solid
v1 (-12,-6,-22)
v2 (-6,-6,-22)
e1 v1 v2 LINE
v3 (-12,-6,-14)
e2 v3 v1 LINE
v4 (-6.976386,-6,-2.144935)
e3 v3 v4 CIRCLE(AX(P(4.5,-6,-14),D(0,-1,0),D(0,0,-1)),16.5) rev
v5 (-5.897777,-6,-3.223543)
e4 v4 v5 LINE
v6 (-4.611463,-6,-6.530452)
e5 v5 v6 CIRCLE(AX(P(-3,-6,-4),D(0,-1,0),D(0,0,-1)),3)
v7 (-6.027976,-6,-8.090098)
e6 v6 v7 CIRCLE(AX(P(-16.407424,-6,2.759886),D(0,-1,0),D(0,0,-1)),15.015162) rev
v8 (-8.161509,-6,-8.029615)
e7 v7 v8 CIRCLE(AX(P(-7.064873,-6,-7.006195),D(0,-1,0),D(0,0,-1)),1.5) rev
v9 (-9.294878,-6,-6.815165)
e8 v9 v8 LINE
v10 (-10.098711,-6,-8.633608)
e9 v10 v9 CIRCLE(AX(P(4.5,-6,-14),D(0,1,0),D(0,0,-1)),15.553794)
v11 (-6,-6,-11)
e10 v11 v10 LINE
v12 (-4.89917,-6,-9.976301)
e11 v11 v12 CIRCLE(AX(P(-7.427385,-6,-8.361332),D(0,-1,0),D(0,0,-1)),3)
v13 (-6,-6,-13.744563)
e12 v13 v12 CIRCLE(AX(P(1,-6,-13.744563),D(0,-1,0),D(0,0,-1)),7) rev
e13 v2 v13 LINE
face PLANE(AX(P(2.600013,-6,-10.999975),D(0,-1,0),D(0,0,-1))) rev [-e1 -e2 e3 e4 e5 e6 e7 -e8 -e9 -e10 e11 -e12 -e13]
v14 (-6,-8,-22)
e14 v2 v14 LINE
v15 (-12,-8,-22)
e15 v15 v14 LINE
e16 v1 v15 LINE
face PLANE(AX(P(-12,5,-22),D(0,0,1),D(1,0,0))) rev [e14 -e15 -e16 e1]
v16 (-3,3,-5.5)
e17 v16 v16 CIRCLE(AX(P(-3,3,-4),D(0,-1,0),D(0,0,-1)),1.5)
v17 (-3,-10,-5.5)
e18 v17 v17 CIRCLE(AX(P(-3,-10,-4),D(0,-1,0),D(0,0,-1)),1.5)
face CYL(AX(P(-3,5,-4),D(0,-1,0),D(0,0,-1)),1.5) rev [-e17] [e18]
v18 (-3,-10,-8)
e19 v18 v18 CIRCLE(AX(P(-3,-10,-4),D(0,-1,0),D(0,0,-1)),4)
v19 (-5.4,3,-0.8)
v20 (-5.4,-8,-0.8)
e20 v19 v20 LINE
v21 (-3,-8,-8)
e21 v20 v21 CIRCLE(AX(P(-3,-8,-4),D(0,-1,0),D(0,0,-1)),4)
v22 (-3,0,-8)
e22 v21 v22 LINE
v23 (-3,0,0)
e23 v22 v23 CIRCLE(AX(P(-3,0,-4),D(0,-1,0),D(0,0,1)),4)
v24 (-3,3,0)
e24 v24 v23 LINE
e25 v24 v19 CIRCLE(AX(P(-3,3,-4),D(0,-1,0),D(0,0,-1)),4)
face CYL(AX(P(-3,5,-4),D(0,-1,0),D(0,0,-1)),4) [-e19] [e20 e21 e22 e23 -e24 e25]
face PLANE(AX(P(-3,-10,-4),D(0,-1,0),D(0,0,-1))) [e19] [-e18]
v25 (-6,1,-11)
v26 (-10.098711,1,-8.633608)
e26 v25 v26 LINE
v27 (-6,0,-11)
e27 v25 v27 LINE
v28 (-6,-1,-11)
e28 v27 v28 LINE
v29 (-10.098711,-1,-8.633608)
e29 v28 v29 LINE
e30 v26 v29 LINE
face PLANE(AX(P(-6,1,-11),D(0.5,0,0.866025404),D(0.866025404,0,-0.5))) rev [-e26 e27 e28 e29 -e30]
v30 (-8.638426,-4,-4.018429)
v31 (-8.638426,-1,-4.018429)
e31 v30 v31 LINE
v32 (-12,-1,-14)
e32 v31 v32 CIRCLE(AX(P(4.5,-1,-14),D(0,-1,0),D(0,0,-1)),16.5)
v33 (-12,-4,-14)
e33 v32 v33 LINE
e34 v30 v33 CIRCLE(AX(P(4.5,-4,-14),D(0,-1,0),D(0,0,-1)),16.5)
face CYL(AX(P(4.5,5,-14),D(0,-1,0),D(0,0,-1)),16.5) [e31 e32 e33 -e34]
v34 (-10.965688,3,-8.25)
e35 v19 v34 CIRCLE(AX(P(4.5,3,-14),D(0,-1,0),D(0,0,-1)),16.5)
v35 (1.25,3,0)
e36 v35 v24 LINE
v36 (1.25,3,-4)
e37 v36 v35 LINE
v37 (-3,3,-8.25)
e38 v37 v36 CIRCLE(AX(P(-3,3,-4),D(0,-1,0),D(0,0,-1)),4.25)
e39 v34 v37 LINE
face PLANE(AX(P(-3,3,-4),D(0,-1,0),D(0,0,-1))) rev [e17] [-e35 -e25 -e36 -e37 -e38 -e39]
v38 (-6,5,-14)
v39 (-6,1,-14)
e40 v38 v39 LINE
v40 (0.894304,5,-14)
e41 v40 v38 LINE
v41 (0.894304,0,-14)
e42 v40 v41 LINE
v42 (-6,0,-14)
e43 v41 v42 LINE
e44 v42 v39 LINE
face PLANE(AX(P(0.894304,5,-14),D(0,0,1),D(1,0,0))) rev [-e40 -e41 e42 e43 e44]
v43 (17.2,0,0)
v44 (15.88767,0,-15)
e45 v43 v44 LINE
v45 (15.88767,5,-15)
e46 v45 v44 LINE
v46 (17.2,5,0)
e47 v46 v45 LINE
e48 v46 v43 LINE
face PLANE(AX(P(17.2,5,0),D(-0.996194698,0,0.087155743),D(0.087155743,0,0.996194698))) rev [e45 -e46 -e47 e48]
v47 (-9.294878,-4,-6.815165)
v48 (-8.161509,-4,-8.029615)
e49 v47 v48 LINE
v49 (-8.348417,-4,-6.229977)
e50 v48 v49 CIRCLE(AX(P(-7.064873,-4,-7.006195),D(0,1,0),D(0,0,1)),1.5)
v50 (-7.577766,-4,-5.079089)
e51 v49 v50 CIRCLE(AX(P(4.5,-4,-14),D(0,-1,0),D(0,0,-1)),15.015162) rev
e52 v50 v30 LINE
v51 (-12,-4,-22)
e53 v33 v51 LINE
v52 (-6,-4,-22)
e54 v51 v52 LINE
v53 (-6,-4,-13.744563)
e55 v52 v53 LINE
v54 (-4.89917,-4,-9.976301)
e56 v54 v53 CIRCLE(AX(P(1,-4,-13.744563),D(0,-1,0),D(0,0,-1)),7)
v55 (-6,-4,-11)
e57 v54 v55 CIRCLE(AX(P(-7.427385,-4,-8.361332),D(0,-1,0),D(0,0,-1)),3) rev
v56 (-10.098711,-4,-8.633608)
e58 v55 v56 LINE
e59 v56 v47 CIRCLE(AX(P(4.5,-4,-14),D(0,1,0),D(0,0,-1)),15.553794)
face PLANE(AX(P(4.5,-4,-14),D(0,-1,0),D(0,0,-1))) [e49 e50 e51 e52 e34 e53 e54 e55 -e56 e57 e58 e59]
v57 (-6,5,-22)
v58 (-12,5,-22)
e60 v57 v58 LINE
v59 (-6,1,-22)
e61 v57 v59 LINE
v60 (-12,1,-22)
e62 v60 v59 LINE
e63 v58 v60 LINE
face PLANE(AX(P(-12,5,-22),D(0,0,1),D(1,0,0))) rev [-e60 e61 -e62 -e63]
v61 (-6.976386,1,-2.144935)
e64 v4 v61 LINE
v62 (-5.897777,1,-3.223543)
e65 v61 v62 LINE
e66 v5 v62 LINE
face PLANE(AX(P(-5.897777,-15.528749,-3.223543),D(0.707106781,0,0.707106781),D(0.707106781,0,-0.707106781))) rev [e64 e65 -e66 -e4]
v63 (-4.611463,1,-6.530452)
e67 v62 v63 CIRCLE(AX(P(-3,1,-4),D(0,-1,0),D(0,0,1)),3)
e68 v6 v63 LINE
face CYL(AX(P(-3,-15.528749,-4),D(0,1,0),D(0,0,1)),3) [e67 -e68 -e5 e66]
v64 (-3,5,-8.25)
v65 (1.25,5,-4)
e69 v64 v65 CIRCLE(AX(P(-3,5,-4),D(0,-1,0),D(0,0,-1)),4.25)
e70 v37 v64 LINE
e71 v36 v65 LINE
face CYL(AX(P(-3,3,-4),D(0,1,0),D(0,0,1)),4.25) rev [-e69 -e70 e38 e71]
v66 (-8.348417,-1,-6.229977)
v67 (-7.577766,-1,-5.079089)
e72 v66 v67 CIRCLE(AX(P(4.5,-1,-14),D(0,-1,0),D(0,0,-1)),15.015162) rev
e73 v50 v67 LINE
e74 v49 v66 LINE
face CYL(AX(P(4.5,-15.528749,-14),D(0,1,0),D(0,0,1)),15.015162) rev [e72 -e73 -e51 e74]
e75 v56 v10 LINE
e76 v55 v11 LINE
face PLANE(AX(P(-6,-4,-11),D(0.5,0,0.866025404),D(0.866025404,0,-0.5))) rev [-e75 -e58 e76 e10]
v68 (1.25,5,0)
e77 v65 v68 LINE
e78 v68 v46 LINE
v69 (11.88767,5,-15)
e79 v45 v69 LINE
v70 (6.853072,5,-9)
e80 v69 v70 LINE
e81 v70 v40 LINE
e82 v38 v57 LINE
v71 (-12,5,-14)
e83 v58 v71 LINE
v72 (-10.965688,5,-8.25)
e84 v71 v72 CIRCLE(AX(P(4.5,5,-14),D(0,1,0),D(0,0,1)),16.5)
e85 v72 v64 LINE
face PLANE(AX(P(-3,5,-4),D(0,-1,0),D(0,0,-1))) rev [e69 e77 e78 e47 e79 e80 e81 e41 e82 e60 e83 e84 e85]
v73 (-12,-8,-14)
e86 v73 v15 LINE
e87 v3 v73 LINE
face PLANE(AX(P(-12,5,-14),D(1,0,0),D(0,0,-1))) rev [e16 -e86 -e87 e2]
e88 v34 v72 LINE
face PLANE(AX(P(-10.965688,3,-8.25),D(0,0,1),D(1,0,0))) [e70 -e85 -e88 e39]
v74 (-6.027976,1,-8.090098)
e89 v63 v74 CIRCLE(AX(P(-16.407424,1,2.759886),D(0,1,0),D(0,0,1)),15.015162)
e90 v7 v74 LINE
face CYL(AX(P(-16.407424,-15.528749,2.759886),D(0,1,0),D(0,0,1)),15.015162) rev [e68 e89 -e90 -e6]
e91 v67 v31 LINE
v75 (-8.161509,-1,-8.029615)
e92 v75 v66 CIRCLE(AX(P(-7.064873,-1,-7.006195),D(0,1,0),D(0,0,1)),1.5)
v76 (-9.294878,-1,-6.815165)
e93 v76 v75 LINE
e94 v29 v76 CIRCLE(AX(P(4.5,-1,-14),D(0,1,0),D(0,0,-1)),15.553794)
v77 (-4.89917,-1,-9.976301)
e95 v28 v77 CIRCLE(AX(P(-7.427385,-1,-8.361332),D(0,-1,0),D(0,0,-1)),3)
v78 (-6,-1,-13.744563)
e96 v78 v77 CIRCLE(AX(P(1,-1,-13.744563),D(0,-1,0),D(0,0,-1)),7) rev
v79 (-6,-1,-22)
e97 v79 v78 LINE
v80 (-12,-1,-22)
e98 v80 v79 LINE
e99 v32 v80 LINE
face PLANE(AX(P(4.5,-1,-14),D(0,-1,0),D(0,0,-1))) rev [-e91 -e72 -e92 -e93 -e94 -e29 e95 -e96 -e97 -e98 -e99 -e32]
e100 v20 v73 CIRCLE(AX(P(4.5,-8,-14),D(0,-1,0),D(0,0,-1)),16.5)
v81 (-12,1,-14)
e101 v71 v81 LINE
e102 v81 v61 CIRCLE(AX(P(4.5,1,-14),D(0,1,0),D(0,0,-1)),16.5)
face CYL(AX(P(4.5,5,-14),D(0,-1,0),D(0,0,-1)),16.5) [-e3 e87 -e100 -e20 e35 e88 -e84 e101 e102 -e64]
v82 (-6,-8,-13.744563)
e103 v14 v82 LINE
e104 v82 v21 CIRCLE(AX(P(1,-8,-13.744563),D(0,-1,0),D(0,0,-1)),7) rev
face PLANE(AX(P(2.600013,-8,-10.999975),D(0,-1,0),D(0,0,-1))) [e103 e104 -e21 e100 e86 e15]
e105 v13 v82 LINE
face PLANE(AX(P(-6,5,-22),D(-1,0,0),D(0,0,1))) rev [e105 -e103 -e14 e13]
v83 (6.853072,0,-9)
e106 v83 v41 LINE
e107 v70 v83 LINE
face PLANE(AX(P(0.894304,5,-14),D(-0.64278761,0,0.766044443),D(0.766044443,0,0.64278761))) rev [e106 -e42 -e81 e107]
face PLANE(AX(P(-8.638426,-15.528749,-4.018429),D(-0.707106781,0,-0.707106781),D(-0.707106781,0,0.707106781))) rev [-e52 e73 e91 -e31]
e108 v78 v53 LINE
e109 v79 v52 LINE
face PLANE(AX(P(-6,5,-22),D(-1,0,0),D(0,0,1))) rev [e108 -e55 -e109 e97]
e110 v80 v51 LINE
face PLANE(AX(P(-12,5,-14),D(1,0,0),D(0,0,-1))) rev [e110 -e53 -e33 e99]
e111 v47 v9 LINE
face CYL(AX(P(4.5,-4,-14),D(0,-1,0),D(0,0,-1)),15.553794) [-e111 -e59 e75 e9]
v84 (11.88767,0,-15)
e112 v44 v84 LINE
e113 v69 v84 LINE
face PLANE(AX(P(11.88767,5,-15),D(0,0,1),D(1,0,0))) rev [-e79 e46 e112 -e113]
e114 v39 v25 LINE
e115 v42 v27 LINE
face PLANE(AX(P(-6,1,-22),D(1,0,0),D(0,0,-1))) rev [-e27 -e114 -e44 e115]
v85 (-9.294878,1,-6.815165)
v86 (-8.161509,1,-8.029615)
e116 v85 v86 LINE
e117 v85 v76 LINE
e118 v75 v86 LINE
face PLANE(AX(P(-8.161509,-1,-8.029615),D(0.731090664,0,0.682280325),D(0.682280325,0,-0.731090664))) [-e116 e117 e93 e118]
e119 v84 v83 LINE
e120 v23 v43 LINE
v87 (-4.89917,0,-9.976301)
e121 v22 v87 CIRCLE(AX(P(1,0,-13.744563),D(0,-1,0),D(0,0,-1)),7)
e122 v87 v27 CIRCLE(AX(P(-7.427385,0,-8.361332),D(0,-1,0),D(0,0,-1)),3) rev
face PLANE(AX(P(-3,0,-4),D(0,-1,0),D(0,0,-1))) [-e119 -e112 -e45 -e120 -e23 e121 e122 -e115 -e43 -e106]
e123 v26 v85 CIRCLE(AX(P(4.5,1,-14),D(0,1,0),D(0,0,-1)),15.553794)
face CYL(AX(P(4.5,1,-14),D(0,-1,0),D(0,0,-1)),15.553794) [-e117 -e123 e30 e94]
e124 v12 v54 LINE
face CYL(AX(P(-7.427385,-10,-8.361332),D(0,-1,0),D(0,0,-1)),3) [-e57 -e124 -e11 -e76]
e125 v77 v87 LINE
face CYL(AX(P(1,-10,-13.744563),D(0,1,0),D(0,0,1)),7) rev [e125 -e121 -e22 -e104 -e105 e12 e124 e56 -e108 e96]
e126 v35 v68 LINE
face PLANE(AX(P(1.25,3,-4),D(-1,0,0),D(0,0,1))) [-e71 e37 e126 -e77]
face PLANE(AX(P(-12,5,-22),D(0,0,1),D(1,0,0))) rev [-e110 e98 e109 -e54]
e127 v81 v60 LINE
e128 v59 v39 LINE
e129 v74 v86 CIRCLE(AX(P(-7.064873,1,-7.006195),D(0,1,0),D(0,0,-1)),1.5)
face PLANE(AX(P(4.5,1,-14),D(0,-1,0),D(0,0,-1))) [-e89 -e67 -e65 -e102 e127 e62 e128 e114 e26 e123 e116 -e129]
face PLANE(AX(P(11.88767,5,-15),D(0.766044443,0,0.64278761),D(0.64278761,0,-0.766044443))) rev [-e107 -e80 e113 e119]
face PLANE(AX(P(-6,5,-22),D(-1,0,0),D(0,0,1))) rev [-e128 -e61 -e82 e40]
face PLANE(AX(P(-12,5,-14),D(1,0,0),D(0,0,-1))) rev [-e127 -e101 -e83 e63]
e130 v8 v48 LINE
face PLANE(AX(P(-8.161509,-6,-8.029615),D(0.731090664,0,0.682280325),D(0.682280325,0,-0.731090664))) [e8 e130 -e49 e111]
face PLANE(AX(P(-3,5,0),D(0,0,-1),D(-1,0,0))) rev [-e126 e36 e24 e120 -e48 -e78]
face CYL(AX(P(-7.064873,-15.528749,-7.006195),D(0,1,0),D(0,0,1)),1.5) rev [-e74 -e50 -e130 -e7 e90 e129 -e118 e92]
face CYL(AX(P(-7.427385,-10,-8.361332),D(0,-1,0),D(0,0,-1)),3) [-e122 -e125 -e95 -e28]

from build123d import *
from build123d.topology import SkipClean

# Parameters (mm, degrees)
SKETCH1_R           = 1.5
BOSS_EXTRUDE1_DEPTH = 5
BOSS_EXTRUDE2_START = 10
SKETCH2_R           = 1.5
BOSS_EXTRUDE2_DEPTH = 10
CUT_EXTRUDE1_DEPTH  = 2
SKETCH4_OUTSIDE_W   = 39.104
SKETCH4_OUTSIDE_H   = 31.904
SKETCH4_OUTSIDE_R   = 4
CUT_EXTRUDE2_DEPTH  = 2
FILLET4_R           = 7
CUT_EXTRUDE5_START  = -9
CUT_EXTRUDE5_DEPTH  = 7
CUT_EXTRUDE7_START  = 2
CUT_EXTRUDE7_DEPTH  = 2
LPATTERN1_COUNT     = 2
LPATTERN1_PITCH     = 5
CUT_EXTRUDE9_START  = -2
CUT_EXTRUDE9_DEPTH  = 2
LPATTERN2_COUNT     = 2
LPATTERN2_PITCH     = 5
FILLET5_START       = -6
FILLET5_DEPTH       = 2
FILLET5_START_2     = -1
FILLET5_2_DEPTH     = 1


with BuildPart() as part:
    # Sketch1 → Boss-Extrude1 (new body)
    with BuildSketch(Plane(origin=(0, 0, 0), x_dir=(1, 0, 0), z_dir=(0, 1, 0))):
        with BuildLine():
            Line((-12, 14), (-12, 22))
            Line((-12, 22), (-6, 22))
            Line((-6, 22), (-6, 14))
            Line((-6, 14), (0.894304297, 14))
            Line((0.894304297, 14), (6.85307226, 9))
            Line((6.85307226, 9), (11.887670047, 15))
            Line((11.887670047, 15), (15.887670047, 15))
            Line((15.887670047, 15), (17.2, 0))
            Line((17.2, 0), (-3, 0))
            ThreePointArc((-3, 0), (-4.264911064, 0.205266808), (-5.4, 0.8))
            ThreePointArc((-5.4, 0.8), (-10.258048651, 6.620975674), (-12, 14))
        make_face()
        with Locations(Location((-3, 4, 0), (0, 0, 270))):
            Circle(SKETCH1_R, mode=Mode.SUBTRACT)
    extrude(amount=BOSS_EXTRUDE1_DEPTH)

    # Sketch2 → Boss-Extrude2 (add)
    with SkipClean():  # the faces are left unmerged after this step: merging them gives an invalid solid
        with BuildSketch(Plane.XZ.offset(BOSS_EXTRUDE2_START)):
            with BuildLine():
                Line((-12, -14), (-12, -22))
                Line((-12, -22), (-6, -22))
                Line((-6, -22), (-6, -8))
                Line((-6, -8), (-3, -8))
                ThreePointArc((-3, -8), (1, -4), (-3, 0))
                ThreePointArc((-3, 0), (-4.264911064, -0.205266808), (-5.4, -0.8))
                ThreePointArc((-5.4, -0.8), (-10.258048651, -6.620975674), (-12, -14))
            make_face()
            with Locations(Location((-3, -4, 0), (0, 0, 270))):
                Circle(SKETCH2_R, mode=Mode.SUBTRACT)
        extrude(amount=-BOSS_EXTRUDE2_DEPTH)

    # Sketch3 → Cut-Extrude1 (cut)
    with SkipClean():  # the faces are left unmerged after this step: merging them gives an invalid solid
        with BuildSketch(Plane(origin=(0, 5, 0), x_dir=(1, 0, 0), z_dir=(0, 1, 0))):
            with BuildLine():
                Line((1.25, 4), (1.25, 0))
                Line((1.25, 0), (-10.965687828, 0))
                Line((-10.965687828, 0), (-10.965687828, 8.25))
                Line((-10.965687828, 8.25), (-3, 8.25))
                ThreePointArc((-3, 8.25), (0.00520382, 7.00520382), (1.25, 4))
            make_face()
        extrude(amount=-CUT_EXTRUDE1_DEPTH, mode=Mode.SUBTRACT)

    # Sketch4 outside → Cut-Extrude2 (cut)
    with SkipClean():  # the faces are left unmerged after this step: merging them gives an invalid solid
        with BuildSketch(Plane.XZ.offset(10)):
            with Locations((2.6, -11)):
                Rectangle(SKETCH4_OUTSIDE_W, SKETCH4_OUTSIDE_H)
            with Locations(Location((-3, -4, 0), (0, 0, 270))):
                Circle(SKETCH4_OUTSIDE_R, mode=Mode.SUBTRACT)
        extrude(amount=-CUT_EXTRUDE2_DEPTH, mode=Mode.SUBTRACT)

    # Fillet4
    # the kernel refuses this fillet: 7 mm, written as the material it adds along each edge
    with BuildSketch(Plane(origin=(-6, -8, -8), x_dir=(0, 0, -1), z_dir=(0, 1, 0))) as fillet4_piece_1:
        with BuildLine():
            CenterArc((5.744562647, -7), FILLET4_R, 90, 55.150095421)
            Line((0, -3), (0, 0))
            Line((0, 0), (5.744562647, 0))
        make_face()
    extrude(amount=8)

    # Sketch8 → Cut-Extrude5 (cut)
    with BuildSketch(Plane(origin=(0, 3, 0), x_dir=(1, 0, 0), z_dir=(0, 1, 0)).offset(CUT_EXTRUDE5_START)):
        with BuildLine():
            Line((-8.638425733, 4.018428517), (-7.577765561, 5.079088689))
            ThreePointArc((-7.577765561, 5.079088689), (-7.976368998, 5.645642084), (-8.348417241, 6.229977223))
            ThreePointArc((-8.348417241, 6.229977223), (-8.003073705, 8.1765706), (-6.027976147, 8.090097651))
            ThreePointArc((-6.027976147, 8.090097651), (-5.292329992, 7.335150748), (-4.61146284, 6.530452037))
            ThreePointArc((-4.61146284, 6.530452037), (-5.795929923, 5.087554995), (-5.897777479, 3.223542865))
            Line((-5.897777479, 3.223542865), (-6.976385628, 2.144934715))
            ThreePointArc((-6.976385628, 2.144934715), (-7.843003254, 3.050101797), (-8.638425733, 4.018428517))
        make_face()
    extrude(amount=CUT_EXTRUDE5_DEPTH, mode=Mode.SUBTRACT)

    # Sketch10 → Cut-Extrude7 (cut)
    with BuildSketch(Plane.XZ.offset(-1).offset(CUT_EXTRUDE7_START)):
        with BuildLine():
            Line((-8.638425733, -4.018428517), (-7.577765561, -5.079088689))
            Line((-7.577765561, -5.079088689), (-8.348417241, -6.229977223))
            ThreePointArc((-8.348417241, -6.229977223), (-8.556847764, -7.161149711), (-8.16150889, -8.029615404))
            Line((-8.16150889, -8.029615404), (-9.977158514, -6.084074194))
            ThreePointArc((-9.977158514, -6.084074194), (-9.346365817, -5.026251972), (-8.638425733, -4.018428517))
        make_face()
    cut_extrude7 = extrude(amount=-CUT_EXTRUDE7_DEPTH, mode=Mode.SUBTRACT)

    # LPattern1: Cut-Extrude7 ×2
    with Locations(*[(0, -i * LPATTERN1_PITCH, 0) for i in range(1, LPATTERN1_COUNT)]):
        add(cut_extrude7, mode=Mode.SUBTRACT)

    # Sketch11 → Cut-Extrude9 (cut)
    with BuildSketch(Plane.XZ.offset(8).offset(CUT_EXTRUDE9_START)):
        with BuildLine():
            Line((-12, -22), (-6, -22))
            Line((-6, -22), (-6, -11))
            Line((-6, -11), (-10.09871087, -8.633608176))
            ThreePointArc((-10.09871087, -8.633608176), (-9.7258799, -7.711529492), (-9.294878189, -6.815164858))
            Line((-9.294878189, -6.815164858), (-9.977158514, -6.084074194))
            ThreePointArc((-9.977158514, -6.084074194), (-11.486292808, -9.914851011), (-12, -14))
            Line((-12, -14), (-12, -22))
        make_face()
    cut_extrude9 = extrude(amount=-CUT_EXTRUDE9_DEPTH, mode=Mode.SUBTRACT)

    # LPattern2: Cut-Extrude9 ×2
    with Locations(*[(0, i * LPATTERN2_PITCH, 0) for i in range(1, LPATTERN2_COUNT)]):
        add(cut_extrude9, mode=Mode.SUBTRACT)

    # Fillet5: read off the stored shape, not the designer's step
    # Fillet5 outline → Fillet5 (cut)
    with BuildSketch(Plane(origin=(0, 0, 0), x_dir=(1, 0, 0), z_dir=(0, 1, 0)).offset(FILLET5_START)):
        with BuildLine():
            Line((-6, 13.744562647), (-6, 11))
            ThreePointArc((-6, 11), (-5.384425539, 10.558219215), (-4.899169706, 9.976300875))
            ThreePointArc((-4.899169706, 9.976300875), (-5.719158725, 11.781680575), (-6, 13.744562647))
        make_face()
    extrude(amount=FILLET5_DEPTH, mode=Mode.SUBTRACT)

    # Fillet5 2 outline → Fillet5 2 (cut)
    with BuildSketch(Plane(origin=(0, 0, 0), x_dir=(1, 0, 0), z_dir=(0, 1, 0)).offset(FILLET5_START_2)):
        with BuildLine():
            Line((-6, 13.744562647), (-6, 11))
            ThreePointArc((-6, 11), (-5.384425539, 10.558219215), (-4.899169706, 9.976300875))
            ThreePointArc((-4.899169706, 9.976300875), (-5.719158725, 11.781680575), (-6, 13.744562647))
        make_face()
    extrude(amount=FILLET5_2_DEPTH, mode=Mode.SUBTRACT)


solid = part.part
